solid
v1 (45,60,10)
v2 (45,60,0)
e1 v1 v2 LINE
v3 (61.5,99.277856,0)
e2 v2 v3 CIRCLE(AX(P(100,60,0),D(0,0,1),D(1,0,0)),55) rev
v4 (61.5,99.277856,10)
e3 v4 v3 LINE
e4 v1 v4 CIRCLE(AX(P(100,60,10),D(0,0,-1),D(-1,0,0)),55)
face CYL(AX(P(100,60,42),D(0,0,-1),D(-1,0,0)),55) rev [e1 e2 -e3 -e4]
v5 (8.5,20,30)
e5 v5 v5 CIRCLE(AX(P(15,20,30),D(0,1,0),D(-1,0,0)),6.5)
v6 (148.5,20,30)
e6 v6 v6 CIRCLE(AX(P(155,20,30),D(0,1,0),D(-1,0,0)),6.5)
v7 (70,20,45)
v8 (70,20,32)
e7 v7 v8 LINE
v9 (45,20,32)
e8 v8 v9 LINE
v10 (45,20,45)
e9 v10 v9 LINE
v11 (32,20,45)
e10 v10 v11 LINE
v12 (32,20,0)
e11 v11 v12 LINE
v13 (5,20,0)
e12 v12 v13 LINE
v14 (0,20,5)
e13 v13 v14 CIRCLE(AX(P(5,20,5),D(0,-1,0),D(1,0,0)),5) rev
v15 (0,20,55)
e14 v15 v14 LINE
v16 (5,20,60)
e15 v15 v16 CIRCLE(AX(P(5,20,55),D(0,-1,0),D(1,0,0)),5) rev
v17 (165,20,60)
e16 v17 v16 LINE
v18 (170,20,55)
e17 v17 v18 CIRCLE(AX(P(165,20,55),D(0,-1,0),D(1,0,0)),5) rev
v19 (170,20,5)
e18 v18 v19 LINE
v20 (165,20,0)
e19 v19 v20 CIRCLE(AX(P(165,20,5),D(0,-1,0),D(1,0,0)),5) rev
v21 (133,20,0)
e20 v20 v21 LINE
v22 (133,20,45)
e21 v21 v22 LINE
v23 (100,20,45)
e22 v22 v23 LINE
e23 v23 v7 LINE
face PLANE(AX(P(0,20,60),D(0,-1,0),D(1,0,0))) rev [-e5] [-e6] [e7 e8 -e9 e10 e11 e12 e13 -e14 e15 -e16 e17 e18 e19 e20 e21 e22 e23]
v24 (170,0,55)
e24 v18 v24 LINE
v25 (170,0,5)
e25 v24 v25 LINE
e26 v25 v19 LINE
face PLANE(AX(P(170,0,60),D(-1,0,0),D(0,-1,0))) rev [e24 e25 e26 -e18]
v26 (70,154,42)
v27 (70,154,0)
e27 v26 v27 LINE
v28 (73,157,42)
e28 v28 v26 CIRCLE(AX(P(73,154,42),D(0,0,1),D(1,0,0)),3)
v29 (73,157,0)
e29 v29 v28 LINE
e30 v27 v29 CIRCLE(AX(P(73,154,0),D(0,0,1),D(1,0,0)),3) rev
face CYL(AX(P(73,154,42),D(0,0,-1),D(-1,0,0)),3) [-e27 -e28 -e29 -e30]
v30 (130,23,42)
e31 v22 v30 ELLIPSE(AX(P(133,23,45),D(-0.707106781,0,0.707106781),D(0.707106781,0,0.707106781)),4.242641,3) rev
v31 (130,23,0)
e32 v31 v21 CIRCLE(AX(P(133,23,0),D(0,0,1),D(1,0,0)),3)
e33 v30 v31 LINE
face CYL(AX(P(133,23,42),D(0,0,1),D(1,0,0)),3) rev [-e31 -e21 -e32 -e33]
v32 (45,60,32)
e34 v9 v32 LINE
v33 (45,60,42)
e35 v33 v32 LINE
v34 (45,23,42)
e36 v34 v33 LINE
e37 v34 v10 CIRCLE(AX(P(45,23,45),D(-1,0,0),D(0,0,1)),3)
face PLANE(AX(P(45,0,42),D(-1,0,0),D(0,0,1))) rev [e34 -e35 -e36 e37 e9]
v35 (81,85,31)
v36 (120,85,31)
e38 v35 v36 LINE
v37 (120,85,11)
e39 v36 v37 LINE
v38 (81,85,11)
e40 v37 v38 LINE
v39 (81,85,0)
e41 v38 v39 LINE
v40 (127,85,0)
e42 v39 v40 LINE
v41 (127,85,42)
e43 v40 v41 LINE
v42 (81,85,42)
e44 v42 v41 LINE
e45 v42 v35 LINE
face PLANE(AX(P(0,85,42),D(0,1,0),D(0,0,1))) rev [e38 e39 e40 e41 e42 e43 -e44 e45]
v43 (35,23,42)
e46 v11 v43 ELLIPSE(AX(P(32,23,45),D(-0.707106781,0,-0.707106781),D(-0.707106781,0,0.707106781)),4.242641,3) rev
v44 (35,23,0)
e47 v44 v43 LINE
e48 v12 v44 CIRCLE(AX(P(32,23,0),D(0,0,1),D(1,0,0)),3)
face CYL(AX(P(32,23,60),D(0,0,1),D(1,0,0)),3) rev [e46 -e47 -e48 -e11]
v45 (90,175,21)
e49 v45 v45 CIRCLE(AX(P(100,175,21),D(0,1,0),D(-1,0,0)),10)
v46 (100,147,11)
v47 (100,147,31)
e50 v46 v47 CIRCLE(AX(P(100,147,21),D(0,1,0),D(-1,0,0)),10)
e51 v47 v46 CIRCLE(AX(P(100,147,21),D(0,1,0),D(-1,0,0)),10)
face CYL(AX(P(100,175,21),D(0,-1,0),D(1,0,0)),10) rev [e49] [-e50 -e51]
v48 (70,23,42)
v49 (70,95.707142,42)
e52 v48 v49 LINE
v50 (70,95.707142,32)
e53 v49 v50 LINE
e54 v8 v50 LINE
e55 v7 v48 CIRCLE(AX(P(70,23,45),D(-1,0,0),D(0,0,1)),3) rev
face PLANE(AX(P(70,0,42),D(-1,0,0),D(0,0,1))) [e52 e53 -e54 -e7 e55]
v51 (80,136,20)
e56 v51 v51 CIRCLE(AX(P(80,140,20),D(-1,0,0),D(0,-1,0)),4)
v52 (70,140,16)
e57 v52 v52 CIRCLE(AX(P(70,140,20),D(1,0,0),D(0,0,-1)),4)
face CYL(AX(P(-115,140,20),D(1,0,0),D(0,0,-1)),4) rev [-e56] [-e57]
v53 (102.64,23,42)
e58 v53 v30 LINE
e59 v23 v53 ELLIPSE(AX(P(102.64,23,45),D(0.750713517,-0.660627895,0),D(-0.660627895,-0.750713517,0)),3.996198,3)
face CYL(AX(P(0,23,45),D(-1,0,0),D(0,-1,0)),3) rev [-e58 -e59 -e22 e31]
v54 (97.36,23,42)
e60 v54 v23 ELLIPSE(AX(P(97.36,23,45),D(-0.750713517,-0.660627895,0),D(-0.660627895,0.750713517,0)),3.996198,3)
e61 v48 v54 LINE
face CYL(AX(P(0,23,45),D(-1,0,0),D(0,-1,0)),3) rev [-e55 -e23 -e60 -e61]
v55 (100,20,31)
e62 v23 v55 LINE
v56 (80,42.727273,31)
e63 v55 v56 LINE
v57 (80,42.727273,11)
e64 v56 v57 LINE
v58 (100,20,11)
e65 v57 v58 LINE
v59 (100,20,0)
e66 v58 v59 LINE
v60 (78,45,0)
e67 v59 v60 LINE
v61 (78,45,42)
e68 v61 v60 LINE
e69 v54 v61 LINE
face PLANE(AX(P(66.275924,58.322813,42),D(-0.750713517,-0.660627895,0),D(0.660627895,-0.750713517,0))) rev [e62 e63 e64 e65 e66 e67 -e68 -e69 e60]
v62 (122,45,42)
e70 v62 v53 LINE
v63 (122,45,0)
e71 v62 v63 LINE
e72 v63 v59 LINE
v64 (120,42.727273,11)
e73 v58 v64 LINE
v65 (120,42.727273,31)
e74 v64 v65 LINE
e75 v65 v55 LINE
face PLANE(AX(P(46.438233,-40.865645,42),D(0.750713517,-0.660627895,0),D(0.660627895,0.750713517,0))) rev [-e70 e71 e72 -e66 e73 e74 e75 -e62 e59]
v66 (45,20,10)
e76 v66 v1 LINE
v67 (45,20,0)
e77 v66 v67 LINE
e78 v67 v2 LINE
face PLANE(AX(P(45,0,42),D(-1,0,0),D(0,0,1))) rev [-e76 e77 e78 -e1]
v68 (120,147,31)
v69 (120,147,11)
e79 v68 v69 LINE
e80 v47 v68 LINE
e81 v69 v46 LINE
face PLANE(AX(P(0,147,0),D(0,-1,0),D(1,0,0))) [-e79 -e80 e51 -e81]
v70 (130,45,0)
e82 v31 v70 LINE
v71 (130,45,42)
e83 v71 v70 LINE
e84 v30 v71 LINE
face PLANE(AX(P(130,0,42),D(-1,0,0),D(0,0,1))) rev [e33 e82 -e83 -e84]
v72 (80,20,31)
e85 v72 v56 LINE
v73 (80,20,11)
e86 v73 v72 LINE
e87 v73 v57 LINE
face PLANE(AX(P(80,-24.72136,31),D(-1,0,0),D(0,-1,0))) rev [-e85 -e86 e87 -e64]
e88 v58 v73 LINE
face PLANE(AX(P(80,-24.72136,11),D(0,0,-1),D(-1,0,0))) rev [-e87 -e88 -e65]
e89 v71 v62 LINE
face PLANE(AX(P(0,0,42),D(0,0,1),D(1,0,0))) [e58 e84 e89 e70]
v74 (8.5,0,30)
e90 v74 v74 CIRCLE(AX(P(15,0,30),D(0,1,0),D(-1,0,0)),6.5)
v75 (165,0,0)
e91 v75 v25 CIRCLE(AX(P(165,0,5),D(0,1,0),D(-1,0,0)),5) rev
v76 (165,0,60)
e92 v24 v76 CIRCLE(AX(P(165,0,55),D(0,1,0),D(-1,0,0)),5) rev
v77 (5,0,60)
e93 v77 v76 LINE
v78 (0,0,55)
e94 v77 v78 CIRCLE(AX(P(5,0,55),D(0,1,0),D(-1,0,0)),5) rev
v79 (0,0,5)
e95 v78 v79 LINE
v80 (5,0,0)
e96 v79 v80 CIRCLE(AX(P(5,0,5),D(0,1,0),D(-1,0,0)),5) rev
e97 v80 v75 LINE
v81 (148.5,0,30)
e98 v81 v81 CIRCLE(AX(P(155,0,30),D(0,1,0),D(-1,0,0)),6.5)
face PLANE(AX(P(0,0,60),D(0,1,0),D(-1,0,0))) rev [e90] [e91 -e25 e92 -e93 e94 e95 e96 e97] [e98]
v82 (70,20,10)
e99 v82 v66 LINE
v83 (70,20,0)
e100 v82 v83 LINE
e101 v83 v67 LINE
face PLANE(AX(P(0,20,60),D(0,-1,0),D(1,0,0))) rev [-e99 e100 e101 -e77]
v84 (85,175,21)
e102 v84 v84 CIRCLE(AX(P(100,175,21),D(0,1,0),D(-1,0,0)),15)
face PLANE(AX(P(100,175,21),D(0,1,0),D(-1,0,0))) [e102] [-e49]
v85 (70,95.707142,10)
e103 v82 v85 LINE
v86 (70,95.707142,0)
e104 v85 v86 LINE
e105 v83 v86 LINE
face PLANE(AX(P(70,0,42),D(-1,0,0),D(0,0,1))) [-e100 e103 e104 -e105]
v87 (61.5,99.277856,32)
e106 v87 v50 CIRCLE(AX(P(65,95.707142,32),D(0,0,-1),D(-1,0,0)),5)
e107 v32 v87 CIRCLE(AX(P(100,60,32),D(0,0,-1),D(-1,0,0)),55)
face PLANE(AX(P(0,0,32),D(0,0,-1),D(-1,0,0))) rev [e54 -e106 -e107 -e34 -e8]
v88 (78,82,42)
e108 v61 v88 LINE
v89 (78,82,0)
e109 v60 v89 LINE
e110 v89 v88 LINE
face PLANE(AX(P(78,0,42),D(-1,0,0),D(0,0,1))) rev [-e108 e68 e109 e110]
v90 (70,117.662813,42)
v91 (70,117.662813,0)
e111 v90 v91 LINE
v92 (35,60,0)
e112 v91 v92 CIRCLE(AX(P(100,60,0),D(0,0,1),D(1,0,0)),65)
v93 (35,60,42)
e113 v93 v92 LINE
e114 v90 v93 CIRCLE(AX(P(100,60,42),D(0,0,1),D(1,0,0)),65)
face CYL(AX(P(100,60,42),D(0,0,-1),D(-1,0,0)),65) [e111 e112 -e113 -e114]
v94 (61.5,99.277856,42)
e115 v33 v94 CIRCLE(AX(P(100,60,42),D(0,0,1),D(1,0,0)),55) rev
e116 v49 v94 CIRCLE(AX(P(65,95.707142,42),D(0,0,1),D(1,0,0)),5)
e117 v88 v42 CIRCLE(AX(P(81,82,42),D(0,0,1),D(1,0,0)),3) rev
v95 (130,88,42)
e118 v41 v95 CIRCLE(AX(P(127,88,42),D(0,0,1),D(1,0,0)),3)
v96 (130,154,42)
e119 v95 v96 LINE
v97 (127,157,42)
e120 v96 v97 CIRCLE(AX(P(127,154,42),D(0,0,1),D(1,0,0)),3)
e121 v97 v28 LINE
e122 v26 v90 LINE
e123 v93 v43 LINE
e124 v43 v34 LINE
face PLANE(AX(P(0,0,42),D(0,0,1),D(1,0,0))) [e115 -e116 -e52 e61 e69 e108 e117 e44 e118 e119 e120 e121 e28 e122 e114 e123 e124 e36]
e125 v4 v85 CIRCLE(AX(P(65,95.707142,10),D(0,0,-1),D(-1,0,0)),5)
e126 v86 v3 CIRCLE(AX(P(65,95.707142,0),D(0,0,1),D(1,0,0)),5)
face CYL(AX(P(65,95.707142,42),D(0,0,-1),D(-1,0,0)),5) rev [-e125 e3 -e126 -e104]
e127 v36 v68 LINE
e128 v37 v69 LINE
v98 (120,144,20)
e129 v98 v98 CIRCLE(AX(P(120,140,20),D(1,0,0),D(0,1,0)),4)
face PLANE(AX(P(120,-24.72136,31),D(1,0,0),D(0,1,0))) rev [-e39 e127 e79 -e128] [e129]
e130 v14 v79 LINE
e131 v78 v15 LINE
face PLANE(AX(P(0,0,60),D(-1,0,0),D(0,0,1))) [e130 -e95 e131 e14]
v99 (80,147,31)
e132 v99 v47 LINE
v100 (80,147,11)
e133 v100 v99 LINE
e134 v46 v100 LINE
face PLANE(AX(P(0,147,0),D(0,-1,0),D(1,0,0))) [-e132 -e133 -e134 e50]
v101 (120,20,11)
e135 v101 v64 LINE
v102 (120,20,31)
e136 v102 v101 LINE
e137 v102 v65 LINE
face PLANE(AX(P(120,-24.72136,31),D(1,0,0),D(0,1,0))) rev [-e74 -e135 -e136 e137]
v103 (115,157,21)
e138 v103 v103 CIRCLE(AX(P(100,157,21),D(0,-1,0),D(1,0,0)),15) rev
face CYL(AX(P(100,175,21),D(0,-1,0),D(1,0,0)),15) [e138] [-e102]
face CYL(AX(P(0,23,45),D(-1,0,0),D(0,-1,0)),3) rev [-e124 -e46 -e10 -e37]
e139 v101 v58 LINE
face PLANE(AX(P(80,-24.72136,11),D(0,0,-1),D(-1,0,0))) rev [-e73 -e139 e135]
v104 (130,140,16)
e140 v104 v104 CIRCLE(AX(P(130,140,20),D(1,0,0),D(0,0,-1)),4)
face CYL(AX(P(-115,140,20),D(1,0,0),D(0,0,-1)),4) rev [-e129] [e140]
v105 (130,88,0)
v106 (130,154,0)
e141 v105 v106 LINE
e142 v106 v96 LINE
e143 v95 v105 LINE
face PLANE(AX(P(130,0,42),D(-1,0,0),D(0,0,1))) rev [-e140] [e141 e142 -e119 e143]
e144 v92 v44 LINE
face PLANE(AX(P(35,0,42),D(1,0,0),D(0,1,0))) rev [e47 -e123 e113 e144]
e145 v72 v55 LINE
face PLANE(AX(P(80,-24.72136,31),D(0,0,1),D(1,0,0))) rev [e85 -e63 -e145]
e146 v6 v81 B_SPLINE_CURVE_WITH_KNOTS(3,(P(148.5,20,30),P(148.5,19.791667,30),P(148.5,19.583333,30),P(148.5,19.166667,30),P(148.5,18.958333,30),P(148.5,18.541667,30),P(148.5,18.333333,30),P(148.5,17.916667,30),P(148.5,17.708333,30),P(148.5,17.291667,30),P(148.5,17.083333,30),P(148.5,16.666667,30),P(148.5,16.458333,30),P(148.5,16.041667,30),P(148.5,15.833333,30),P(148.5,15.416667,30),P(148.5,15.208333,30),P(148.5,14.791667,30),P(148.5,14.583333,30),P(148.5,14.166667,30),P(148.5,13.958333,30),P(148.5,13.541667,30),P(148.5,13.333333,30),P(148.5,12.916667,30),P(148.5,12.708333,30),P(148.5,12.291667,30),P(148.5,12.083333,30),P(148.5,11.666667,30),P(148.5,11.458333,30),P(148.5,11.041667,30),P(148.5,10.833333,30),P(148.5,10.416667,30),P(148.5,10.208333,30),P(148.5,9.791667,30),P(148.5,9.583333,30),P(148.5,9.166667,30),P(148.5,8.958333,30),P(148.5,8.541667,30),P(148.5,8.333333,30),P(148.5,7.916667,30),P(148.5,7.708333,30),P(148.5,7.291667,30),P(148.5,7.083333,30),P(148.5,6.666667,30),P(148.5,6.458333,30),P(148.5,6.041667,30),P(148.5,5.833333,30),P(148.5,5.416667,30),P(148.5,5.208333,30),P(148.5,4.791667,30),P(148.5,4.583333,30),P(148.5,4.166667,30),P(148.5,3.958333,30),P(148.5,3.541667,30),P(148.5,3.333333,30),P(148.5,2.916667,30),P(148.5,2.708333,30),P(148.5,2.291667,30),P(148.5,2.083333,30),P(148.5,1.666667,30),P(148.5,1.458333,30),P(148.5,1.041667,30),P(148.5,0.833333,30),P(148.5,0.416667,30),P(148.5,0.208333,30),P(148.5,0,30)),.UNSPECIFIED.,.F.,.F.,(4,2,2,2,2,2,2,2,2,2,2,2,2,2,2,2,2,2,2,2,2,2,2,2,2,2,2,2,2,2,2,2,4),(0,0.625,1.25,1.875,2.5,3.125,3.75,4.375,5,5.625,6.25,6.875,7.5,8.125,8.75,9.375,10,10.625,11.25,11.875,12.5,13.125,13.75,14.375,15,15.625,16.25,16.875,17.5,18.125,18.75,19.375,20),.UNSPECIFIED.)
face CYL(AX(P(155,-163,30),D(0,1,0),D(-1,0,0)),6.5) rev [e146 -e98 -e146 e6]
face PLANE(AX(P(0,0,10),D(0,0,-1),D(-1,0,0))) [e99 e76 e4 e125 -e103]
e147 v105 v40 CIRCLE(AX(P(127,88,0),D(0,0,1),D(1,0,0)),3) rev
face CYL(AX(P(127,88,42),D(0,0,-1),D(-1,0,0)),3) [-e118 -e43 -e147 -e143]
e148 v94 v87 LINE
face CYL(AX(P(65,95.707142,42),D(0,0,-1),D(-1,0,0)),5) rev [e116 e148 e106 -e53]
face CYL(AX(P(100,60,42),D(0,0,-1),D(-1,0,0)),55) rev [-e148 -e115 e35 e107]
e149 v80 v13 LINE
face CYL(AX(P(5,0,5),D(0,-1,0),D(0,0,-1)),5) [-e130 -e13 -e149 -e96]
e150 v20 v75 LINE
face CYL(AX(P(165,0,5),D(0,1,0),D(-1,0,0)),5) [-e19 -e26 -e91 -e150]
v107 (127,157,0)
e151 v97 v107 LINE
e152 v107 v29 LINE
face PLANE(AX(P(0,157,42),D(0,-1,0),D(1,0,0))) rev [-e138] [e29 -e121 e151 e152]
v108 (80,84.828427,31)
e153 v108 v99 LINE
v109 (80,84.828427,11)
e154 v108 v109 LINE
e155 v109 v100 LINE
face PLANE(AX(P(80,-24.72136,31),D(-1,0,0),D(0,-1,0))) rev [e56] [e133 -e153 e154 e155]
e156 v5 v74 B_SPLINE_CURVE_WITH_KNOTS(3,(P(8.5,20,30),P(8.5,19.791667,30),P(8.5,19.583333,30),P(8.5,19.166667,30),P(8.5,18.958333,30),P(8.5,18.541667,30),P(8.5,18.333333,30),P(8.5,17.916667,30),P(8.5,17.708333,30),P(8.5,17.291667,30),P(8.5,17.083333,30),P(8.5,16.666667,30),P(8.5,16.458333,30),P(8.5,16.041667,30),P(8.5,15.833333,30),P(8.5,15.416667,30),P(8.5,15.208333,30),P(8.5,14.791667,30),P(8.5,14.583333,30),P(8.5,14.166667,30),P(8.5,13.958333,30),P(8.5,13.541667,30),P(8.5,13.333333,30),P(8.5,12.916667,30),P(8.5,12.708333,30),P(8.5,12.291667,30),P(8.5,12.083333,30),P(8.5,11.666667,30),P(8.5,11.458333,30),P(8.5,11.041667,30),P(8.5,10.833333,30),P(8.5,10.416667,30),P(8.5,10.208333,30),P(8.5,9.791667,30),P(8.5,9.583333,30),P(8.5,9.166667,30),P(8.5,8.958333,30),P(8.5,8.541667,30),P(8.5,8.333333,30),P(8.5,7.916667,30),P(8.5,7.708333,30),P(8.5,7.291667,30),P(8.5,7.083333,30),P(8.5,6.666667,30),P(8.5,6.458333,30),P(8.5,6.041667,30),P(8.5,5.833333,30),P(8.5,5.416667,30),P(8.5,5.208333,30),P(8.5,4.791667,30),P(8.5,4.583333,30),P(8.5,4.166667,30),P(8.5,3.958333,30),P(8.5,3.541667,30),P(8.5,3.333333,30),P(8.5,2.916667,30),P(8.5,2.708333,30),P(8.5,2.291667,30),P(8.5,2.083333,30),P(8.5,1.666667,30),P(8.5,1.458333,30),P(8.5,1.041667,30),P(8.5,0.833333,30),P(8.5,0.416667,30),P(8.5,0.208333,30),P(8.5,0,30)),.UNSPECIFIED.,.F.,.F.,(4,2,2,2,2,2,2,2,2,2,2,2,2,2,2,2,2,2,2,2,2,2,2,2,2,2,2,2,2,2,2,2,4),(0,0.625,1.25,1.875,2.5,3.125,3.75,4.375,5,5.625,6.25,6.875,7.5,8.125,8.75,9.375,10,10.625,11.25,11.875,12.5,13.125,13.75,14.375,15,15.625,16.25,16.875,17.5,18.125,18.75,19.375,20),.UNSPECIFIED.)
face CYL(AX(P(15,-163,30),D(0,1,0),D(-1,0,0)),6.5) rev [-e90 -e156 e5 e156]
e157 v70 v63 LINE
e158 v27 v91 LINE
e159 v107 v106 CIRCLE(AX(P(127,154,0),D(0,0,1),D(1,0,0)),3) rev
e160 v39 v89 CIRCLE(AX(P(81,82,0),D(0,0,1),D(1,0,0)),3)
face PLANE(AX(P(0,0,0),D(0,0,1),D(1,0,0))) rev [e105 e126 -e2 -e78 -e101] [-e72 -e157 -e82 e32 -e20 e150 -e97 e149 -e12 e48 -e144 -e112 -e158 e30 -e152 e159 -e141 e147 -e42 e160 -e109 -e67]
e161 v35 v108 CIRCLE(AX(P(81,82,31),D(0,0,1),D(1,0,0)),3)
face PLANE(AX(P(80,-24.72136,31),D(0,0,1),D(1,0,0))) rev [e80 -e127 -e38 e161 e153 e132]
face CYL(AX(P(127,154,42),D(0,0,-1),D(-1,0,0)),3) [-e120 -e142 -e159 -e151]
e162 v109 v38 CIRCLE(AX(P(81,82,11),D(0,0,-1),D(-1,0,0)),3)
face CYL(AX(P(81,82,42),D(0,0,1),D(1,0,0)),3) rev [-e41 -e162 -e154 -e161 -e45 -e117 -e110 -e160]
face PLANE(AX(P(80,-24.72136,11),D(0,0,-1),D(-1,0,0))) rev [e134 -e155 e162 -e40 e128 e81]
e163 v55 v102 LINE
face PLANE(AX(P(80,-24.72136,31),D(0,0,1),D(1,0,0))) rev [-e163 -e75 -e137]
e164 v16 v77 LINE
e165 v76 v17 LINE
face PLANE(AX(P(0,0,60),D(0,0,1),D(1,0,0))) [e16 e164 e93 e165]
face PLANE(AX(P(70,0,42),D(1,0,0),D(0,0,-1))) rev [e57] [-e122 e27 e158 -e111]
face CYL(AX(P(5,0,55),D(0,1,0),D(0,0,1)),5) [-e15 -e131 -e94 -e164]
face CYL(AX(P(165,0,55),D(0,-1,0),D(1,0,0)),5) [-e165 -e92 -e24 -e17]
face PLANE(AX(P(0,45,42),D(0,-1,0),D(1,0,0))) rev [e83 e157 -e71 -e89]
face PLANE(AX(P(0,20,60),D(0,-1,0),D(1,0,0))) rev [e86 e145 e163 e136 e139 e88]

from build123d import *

# Parameters (mm, degrees)
BOSS_EXTRUDE1_DEPTH = 60
BOSS_EXTRUDE2_DEPTH = 42
CUT_EXTRUDE1_DEPTH  = 42
SKETCH4_R           = 15
SKETCH4_R_2         = 10
BOSS_EXTRUDE4_DEPTH = 18
CUT_EXTRUDE2_START  = -10
SKETCH4_2_R         = 10
CUT_EXTRUDE2_DEPTH  = 10
CUT_EXTRUDE3_START  = -127
SKETCH5_W           = 40
SKETCH5_H           = 20
CUT_EXTRUDE3_DEPTH  = 127
SKETCH6_R           = 6.5
CUT_EXTRUDE4_DEPTH  = 183
SKETCH7_R           = 4
CUT_EXTRUDE5_DEPTH  = 245
FILLET1_R           = 3
FILLET2_R           = 5
BOSS_EXTRUDE6_DEPTH = 22


with BuildPart() as part:
    # Sketch1 → Boss-Extrude1 (new body)
    with BuildSketch(Plane.XY):
        Polygon((170, 20), (130, 20), (0, 20), (0, 0), (170, 0), align=None)
    extrude(amount=BOSS_EXTRUDE1_DEPTH)

    # Sketch1<3> → Boss-Extrude2 (add)
    with BuildSketch(Plane.XY):
        with BuildLine():
            Line((35, 60), (35, 20))
            Line((35, 20), (45, 20))
            Line((45, 20), (45, 60))
            ThreePointArc((45, 60), (49.292505485, 81.301408404), (61.5, 99.277856357))
            ThreePointArc((61.5, 99.277856357), (66.936491673, 100.316914371), (70, 95.707142143))
            Line((70, 95.707142143), (70, 20))
            Line((70, 20), (100, 20))
            Line((100, 20), (78, 45))
            Line((78, 45), (78, 85))
            Line((78, 85), (130, 85))
            Line((130, 85), (130, 157))
            Line((130, 157), (115, 157))
            Line((115, 157), (115, 175))
            Line((115, 175), (85, 175))
            Line((85, 175), (85, 157))
            Line((85, 157), (70, 157))
            Line((70, 157), (70, 117.662812973))
            ThreePointArc((70, 117.662812973), (44.434723073, 93.726843908), (35, 60))
        make_face()
        Polygon((100, 20), (130, 20), (130, 45), (122, 45), align=None)
    extrude(amount=BOSS_EXTRUDE2_DEPTH)

    # Sketch3 → Cut-Extrude1 (cut)
    with BuildSketch(Plane(origin=(115, 0, 0), x_dir=(0, 0, -1), z_dir=(1, 0, 0))):
        Polygon((-42, 157), (7.234036257, 157), (7.234036257, 179.627454065), (-54.634398112, 179.627454065), (-54.634398112, 157), align=None)
    extrude(amount=-CUT_EXTRUDE1_DEPTH, mode=Mode.SUBTRACT)

    # Sketch4 → Boss-Extrude4 (add)
    with BuildSketch(Plane(origin=(0, 157, 0), x_dir=(1, 0, 0), z_dir=(0, 1, 0))):
        with Locations((100, -21)):
            Circle(SKETCH4_R)
        with Locations(Location((100, -21, 0), (0, 0, 180))):
            Circle(SKETCH4_R_2, mode=Mode.SUBTRACT)
    extrude(amount=BOSS_EXTRUDE4_DEPTH)

    # Sketch4<2> → Cut-Extrude2 (cut)
    with BuildSketch(Plane(origin=(0, 157, 0), x_dir=(1, 0, 0), z_dir=(0, 1, 0)).offset(CUT_EXTRUDE2_START)):
        with Locations(Location((100, -21, 0), (0, 0, 180))):
            Circle(SKETCH4_2_R)
    extrude(amount=CUT_EXTRUDE2_DEPTH, mode=Mode.SUBTRACT)

    # Sketch5 → Cut-Extrude3 (cut)
    with BuildSketch(Plane(origin=(0, 147, 0), x_dir=(1, 0, 0), z_dir=(0, 1, 0)).offset(CUT_EXTRUDE3_START)):
        with Locations((100, -21)):
            Rectangle(SKETCH5_W, SKETCH5_H)
    extrude(amount=CUT_EXTRUDE3_DEPTH, mode=Mode.SUBTRACT)

    # Sketch6 → Cut-Extrude4 (cut)
    with BuildSketch(Plane(origin=(0, 20, 0), x_dir=(1, 0, 0), z_dir=(0, 1, 0))):
        with Locations(Location((15, -30, 0), (0, 0, 180))):
            Circle(SKETCH6_R)
        with Locations(Location((155, -30, 0), (0, 0, 180))):
            Circle(SKETCH6_R)
    extrude(amount=-CUT_EXTRUDE4_DEPTH, mode=Mode.SUBTRACT)

    # Sketch7 → Cut-Extrude5 (cut)
    with BuildSketch(Plane(origin=(130, 0, 0), x_dir=(0, 0, -1), z_dir=(1, 0, 0))):
        with Locations((-20, 140)):
            Circle(SKETCH7_R)
    extrude(amount=-CUT_EXTRUDE5_DEPTH, mode=Mode.SUBTRACT)

    # Fillet1
    # the kernel refuses this fillet: 3 mm, written as the material it adds along each edge
    with BuildSketch(Plane(origin=(100, 20, 42), x_dir=(0, 0, 1), z_dir=(1, 0, 0))) as fillet1_piece_1_section:
        with BuildLine():
            CenterArc((FILLET1_R, -FILLET1_R), FILLET1_R, 90, 90)
            Line((0, -FILLET1_R), (0, 0))
            Line((0, 0), (FILLET1_R, 0))
        make_face()
    fillet1_piece_1 = extrude(amount=30, mode=Mode.PRIVATE)
    fillet1_piece_1 = split(fillet1_piece_1, bisect_by=Plane(origin=(107.006094621, 27.96147116, 42.686468699), z_dir=(0.7507135169227557, -0.6606278948920244, 0)), keep=Keep.TOP, mode=Mode.PRIVATE)
    add(fillet1_piece_1)
    with BuildSketch(Plane(origin=(78, 85, 0), x_dir=(0, -1, 0), z_dir=(0, 0, 1))) as fillet1_piece_2_section:
        with BuildLine():
            CenterArc((FILLET1_R, FILLET1_R), FILLET1_R, 180, 90)
            Line((0, FILLET1_R), (0, 0))
            Line((0, 0), (FILLET1_R, 0))
        make_face()
    fillet1_piece_2 = extrude(amount=42, mode=Mode.PRIVATE)
    fillet1_piece_2 = split(fillet1_piece_2, bisect_by=Plane(origin=(78.588320005, 84.284989696, 11), z_dir=(0, 0, -1)), keep=Keep.TOP, mode=Mode.PRIVATE)
    fillet1_piece_2 = split(fillet1_piece_2, bisect_by=Plane(origin=(80, 84.284989696, 5.5), z_dir=(-1, 0, 0)), keep=Keep.TOP, mode=Mode.PRIVATE)
    add(fillet1_piece_2)
    with BuildSketch(Plane(origin=(78, 85, 0), x_dir=(0, -1, 0), z_dir=(0, 0, 1))) as fillet1_piece_3_section:
        with BuildLine():
            CenterArc((FILLET1_R, FILLET1_R), FILLET1_R, 180, 90)
            Line((0, FILLET1_R), (0, 0))
            Line((0, 0), (FILLET1_R, 0))
        make_face()
    fillet1_piece_3 = extrude(amount=42, mode=Mode.PRIVATE)
    fillet1_piece_3 = split(fillet1_piece_3, bisect_by=Plane(origin=(80.37802851, 84.990607918, 11), z_dir=(0, 0, -1)), keep=Keep.TOP, mode=Mode.PRIVATE)
    fillet1_piece_3 = split(fillet1_piece_3, bisect_by=Plane(origin=(80, 84.990607918, 5.5), z_dir=(1, 0, 0)), keep=Keep.TOP, mode=Mode.PRIVATE)
    add(fillet1_piece_3)
    with BuildSketch(Plane(origin=(78, 85, 0), x_dir=(0, -1, 0), z_dir=(0, 0, 1))) as fillet1_piece_4_section:
        with BuildLine():
            CenterArc((FILLET1_R, FILLET1_R), FILLET1_R, 180, 90)
            Line((0, FILLET1_R), (0, 0))
            Line((0, 0), (FILLET1_R, 0))
        make_face()
    fillet1_piece_4 = extrude(amount=42, mode=Mode.PRIVATE)
    fillet1_piece_4 = split(fillet1_piece_4, bisect_by=Plane(origin=(78.588320005, 84.284989696, 11), z_dir=(0, 0, 1)), keep=Keep.TOP, mode=Mode.PRIVATE)
    fillet1_piece_4 = split(fillet1_piece_4, bisect_by=Plane(origin=(80, 84.284989696, 21), z_dir=(-1, 0, 0)), keep=Keep.TOP, mode=Mode.PRIVATE)
    fillet1_piece_4 = split(fillet1_piece_4, bisect_by=Plane(origin=(78.588320005, 84.284989696, 31), z_dir=(0, 0, -1)), keep=Keep.TOP, mode=Mode.PRIVATE)
    add(fillet1_piece_4)
    with BuildSketch(Plane(origin=(78, 85, 0), x_dir=(0, -1, 0), z_dir=(0, 0, 1))) as fillet1_piece_5_section:
        with BuildLine():
            CenterArc((FILLET1_R, FILLET1_R), FILLET1_R, 180, 90)
            Line((0, FILLET1_R), (0, 0))
            Line((0, 0), (FILLET1_R, 0))
        make_face()
    fillet1_piece_5 = extrude(amount=42, mode=Mode.PRIVATE)
    fillet1_piece_5 = split(fillet1_piece_5, bisect_by=Plane(origin=(80, 84.284989696, 36.5), z_dir=(-1, 0, 0)), keep=Keep.TOP, mode=Mode.PRIVATE)
    fillet1_piece_5 = split(fillet1_piece_5, bisect_by=Plane(origin=(78.588320005, 84.284989696, 31), z_dir=(0, 0, 1)), keep=Keep.TOP, mode=Mode.PRIVATE)
    add(fillet1_piece_5)
    with BuildSketch(Plane(origin=(78, 85, 0), x_dir=(0, -1, 0), z_dir=(0, 0, 1))) as fillet1_piece_6_section:
        with BuildLine():
            CenterArc((FILLET1_R, FILLET1_R), FILLET1_R, 180, 90)
            Line((0, FILLET1_R), (0, 0))
            Line((0, 0), (FILLET1_R, 0))
        make_face()
    fillet1_piece_6 = extrude(amount=42, mode=Mode.PRIVATE)
    fillet1_piece_6 = split(fillet1_piece_6, bisect_by=Plane(origin=(80, 84.990607918, 36.5), z_dir=(1, 0, 0)), keep=Keep.TOP, mode=Mode.PRIVATE)
    fillet1_piece_6 = split(fillet1_piece_6, bisect_by=Plane(origin=(80.37802851, 84.990607918, 31), z_dir=(0, 0, 1)), keep=Keep.TOP, mode=Mode.PRIVATE)
    add(fillet1_piece_6)
    with BuildSketch(Plane(origin=(130, 20, 0), x_dir=(1, 0, 0), z_dir=(0, 0, 1))) as fillet1_piece_7:
        with BuildLine():
            CenterArc((FILLET1_R, FILLET1_R), FILLET1_R, 180, 90)
            Line((0, FILLET1_R), (0, 0))
            Line((0, 0), (FILLET1_R, 0))
        make_face()
    extrude(amount=42)
    with BuildSketch(Plane(origin=(70, 20, 42), x_dir=(0, 0, 1), z_dir=(1, 0, 0))) as fillet1_piece_8_section:
        with BuildLine():
            CenterArc((FILLET1_R, -FILLET1_R), FILLET1_R, 90, 90)
            Line((0, -FILLET1_R), (0, 0))
            Line((0, 0), (FILLET1_R, 0))
        make_face()
    fillet1_piece_8 = extrude(amount=30, mode=Mode.PRIVATE)
    fillet1_piece_8 = split(fillet1_piece_8, bisect_by=Plane(origin=(92.993905379, 27.96147116, 42.686468699), z_dir=(-0.7507135169227557, -0.6606278948920244, 0)), keep=Keep.TOP, mode=Mode.PRIVATE)
    add(fillet1_piece_8)
    with BuildSketch(Plane(origin=(35, 20, 0), x_dir=(-1, 0, 0), z_dir=(0, 0, 1))) as fillet1_piece_9:
        with BuildLine():
            CenterArc((FILLET1_R, -FILLET1_R), FILLET1_R, 90, 90)
            Line((0, -FILLET1_R), (0, 0))
            Line((0, 0), (FILLET1_R, 0))
        make_face()
    extrude(amount=42)
    with BuildSketch(Plane(origin=(35, 20, 42), x_dir=(0, 0, 1), z_dir=(1, 0, 0))) as fillet1_piece_10:
        with BuildLine():
            CenterArc((FILLET1_R, -FILLET1_R), FILLET1_R, 90, 90)
            Line((0, -FILLET1_R), (0, 0))
            Line((0, 0), (FILLET1_R, 0))
        make_face()
    extrude(amount=10)
    with BuildSketch(Plane(origin=(130, 20, 0), x_dir=(1, 0, 0), z_dir=(0, 0, 1))) as fillet1_piece_11a_section:
        with BuildLine():
            CenterArc((FILLET1_R, FILLET1_R), FILLET1_R, 180, 90)
            Line((0, FILLET1_R), (0, 0))
            Line((0, 0), (FILLET1_R, 0))
        make_face()
    fillet1_piece_11a = extrude(amount=49.5, mode=Mode.PRIVATE)
    fillet1_piece_11a = split(fillet1_piece_11a, bisect_by=Plane(origin=(130.679185343, 20.679185343, 42), z_dir=(0, 0, 1)), keep=Keep.TOP, mode=Mode.PRIVATE)
    with BuildSketch(Plane(origin=(100, 20, 42), x_dir=(0, 0, 1), z_dir=(1, 0, 0))) as fillet1_piece_11b_section:
        with BuildLine():
            CenterArc((FILLET1_R, -FILLET1_R), FILLET1_R, 90, 90)
            Line((0, -FILLET1_R), (0, 0))
            Line((0, 0), (FILLET1_R, 0))
        make_face()
    fillet1_piece_11b = extrude(amount=37.5, mode=Mode.PRIVATE)
    fillet1_piece_11b = split(fillet1_piece_11b, bisect_by=Plane(origin=(130, 20.679185343, 42.679185343), z_dir=(1, 0, 0)), keep=Keep.TOP, mode=Mode.PRIVATE)
    fillet1_piece_11 = fillet1_piece_11a & fillet1_piece_11b
    add(fillet1_piece_11)
    with BuildSketch(Plane(origin=(35, 20, 0), x_dir=(-1, 0, 0), z_dir=(0, 0, 1))) as fillet1_piece_12a_section:
        with BuildLine():
            CenterArc((FILLET1_R, -FILLET1_R), FILLET1_R, 90, 90)
            Line((0, -FILLET1_R), (0, 0))
            Line((0, 0), (FILLET1_R, 0))
        make_face()
    fillet1_piece_12a = extrude(amount=49.5, mode=Mode.PRIVATE)
    fillet1_piece_12a = split(fillet1_piece_12a, bisect_by=Plane(origin=(34.320814657, 20.679185343, 42), z_dir=(0, 0, 1)), keep=Keep.TOP, mode=Mode.PRIVATE)
    with BuildSketch(Plane(origin=(27.5, 20, 42), x_dir=(0, 0, 1), z_dir=(1, 0, 0))) as fillet1_piece_12b_section:
        with BuildLine():
            CenterArc((FILLET1_R, -FILLET1_R), FILLET1_R, 90, 90)
            Line((0, -FILLET1_R), (0, 0))
            Line((0, 0), (FILLET1_R, 0))
        make_face()
    fillet1_piece_12b = extrude(amount=17.5, mode=Mode.PRIVATE)
    fillet1_piece_12b = split(fillet1_piece_12b, bisect_by=Plane(origin=(35, 20.679185343, 42.679185343), z_dir=(-1, 0, 0)), keep=Keep.TOP, mode=Mode.PRIVATE)
    fillet1_piece_12 = fillet1_piece_12a & fillet1_piece_12b
    add(fillet1_piece_12)
    # the kernel refuses this fillet: 3 mm, written as the material it takes off along each edge
    with BuildSketch(Plane(origin=(70, 157, -7.5), x_dir=(1, 0, 0), z_dir=(0, 0, 1))) as fillet1_2_piece_1:
        with BuildLine():
            CenterArc((FILLET1_R, -FILLET1_R), FILLET1_R, 90, 90)
            Line((0, -FILLET1_R), (0, 0))
            Line((0, 0), (FILLET1_R, 0))
        make_face()
    extrude(amount=57, mode=Mode.SUBTRACT)
    with BuildSketch(Plane(origin=(130, 157, -7.5), x_dir=(-1, 0, 0), z_dir=(0, 0, 1)), Plane(origin=(130, 85, -7.5), x_dir=(0, 1, 0), z_dir=(0, 0, 1))) as fillet1_2_piece_2:
        with BuildLine():
            CenterArc((FILLET1_R, FILLET1_R), FILLET1_R, 180, 90)
            Line((0, FILLET1_R), (0, 0))
            Line((0, 0), (FILLET1_R, 0))
        make_face()
    extrude(amount=57, mode=Mode.SUBTRACT)

    # Fillet2
    fillet2_edges = [part.edges().sort_by_distance(p)[0] for p in [
        (0, 10, 60),
        (170, 10, 60),
        (170, 10, 0),
        (0, 10, 0),
    ]]
    fillet(fillet2_edges, radius=FILLET2_R)

    # Sketch8 → Boss-Extrude6 (add)
    with BuildSketch(Plane(origin=(0, 0, 10), x_dir=(-1, 0, 0), z_dir=(0, 0, -1))):
        with BuildLine():
            ThreePointArc((-45, 60), (-49.292505485, 81.301408404), (-61.5, 99.277856357))
            ThreePointArc((-61.5, 99.277856357), (-66.936491673, 100.316914371), (-70, 95.707142143))
            Line((-70, 95.707142143), (-70, 20))
            Line((-70, 20), (-45, 20))
            Line((-45, 20), (-45, 60))
        make_face()
    extrude(amount=-BOSS_EXTRUDE6_DEPTH)


solid = part.part
